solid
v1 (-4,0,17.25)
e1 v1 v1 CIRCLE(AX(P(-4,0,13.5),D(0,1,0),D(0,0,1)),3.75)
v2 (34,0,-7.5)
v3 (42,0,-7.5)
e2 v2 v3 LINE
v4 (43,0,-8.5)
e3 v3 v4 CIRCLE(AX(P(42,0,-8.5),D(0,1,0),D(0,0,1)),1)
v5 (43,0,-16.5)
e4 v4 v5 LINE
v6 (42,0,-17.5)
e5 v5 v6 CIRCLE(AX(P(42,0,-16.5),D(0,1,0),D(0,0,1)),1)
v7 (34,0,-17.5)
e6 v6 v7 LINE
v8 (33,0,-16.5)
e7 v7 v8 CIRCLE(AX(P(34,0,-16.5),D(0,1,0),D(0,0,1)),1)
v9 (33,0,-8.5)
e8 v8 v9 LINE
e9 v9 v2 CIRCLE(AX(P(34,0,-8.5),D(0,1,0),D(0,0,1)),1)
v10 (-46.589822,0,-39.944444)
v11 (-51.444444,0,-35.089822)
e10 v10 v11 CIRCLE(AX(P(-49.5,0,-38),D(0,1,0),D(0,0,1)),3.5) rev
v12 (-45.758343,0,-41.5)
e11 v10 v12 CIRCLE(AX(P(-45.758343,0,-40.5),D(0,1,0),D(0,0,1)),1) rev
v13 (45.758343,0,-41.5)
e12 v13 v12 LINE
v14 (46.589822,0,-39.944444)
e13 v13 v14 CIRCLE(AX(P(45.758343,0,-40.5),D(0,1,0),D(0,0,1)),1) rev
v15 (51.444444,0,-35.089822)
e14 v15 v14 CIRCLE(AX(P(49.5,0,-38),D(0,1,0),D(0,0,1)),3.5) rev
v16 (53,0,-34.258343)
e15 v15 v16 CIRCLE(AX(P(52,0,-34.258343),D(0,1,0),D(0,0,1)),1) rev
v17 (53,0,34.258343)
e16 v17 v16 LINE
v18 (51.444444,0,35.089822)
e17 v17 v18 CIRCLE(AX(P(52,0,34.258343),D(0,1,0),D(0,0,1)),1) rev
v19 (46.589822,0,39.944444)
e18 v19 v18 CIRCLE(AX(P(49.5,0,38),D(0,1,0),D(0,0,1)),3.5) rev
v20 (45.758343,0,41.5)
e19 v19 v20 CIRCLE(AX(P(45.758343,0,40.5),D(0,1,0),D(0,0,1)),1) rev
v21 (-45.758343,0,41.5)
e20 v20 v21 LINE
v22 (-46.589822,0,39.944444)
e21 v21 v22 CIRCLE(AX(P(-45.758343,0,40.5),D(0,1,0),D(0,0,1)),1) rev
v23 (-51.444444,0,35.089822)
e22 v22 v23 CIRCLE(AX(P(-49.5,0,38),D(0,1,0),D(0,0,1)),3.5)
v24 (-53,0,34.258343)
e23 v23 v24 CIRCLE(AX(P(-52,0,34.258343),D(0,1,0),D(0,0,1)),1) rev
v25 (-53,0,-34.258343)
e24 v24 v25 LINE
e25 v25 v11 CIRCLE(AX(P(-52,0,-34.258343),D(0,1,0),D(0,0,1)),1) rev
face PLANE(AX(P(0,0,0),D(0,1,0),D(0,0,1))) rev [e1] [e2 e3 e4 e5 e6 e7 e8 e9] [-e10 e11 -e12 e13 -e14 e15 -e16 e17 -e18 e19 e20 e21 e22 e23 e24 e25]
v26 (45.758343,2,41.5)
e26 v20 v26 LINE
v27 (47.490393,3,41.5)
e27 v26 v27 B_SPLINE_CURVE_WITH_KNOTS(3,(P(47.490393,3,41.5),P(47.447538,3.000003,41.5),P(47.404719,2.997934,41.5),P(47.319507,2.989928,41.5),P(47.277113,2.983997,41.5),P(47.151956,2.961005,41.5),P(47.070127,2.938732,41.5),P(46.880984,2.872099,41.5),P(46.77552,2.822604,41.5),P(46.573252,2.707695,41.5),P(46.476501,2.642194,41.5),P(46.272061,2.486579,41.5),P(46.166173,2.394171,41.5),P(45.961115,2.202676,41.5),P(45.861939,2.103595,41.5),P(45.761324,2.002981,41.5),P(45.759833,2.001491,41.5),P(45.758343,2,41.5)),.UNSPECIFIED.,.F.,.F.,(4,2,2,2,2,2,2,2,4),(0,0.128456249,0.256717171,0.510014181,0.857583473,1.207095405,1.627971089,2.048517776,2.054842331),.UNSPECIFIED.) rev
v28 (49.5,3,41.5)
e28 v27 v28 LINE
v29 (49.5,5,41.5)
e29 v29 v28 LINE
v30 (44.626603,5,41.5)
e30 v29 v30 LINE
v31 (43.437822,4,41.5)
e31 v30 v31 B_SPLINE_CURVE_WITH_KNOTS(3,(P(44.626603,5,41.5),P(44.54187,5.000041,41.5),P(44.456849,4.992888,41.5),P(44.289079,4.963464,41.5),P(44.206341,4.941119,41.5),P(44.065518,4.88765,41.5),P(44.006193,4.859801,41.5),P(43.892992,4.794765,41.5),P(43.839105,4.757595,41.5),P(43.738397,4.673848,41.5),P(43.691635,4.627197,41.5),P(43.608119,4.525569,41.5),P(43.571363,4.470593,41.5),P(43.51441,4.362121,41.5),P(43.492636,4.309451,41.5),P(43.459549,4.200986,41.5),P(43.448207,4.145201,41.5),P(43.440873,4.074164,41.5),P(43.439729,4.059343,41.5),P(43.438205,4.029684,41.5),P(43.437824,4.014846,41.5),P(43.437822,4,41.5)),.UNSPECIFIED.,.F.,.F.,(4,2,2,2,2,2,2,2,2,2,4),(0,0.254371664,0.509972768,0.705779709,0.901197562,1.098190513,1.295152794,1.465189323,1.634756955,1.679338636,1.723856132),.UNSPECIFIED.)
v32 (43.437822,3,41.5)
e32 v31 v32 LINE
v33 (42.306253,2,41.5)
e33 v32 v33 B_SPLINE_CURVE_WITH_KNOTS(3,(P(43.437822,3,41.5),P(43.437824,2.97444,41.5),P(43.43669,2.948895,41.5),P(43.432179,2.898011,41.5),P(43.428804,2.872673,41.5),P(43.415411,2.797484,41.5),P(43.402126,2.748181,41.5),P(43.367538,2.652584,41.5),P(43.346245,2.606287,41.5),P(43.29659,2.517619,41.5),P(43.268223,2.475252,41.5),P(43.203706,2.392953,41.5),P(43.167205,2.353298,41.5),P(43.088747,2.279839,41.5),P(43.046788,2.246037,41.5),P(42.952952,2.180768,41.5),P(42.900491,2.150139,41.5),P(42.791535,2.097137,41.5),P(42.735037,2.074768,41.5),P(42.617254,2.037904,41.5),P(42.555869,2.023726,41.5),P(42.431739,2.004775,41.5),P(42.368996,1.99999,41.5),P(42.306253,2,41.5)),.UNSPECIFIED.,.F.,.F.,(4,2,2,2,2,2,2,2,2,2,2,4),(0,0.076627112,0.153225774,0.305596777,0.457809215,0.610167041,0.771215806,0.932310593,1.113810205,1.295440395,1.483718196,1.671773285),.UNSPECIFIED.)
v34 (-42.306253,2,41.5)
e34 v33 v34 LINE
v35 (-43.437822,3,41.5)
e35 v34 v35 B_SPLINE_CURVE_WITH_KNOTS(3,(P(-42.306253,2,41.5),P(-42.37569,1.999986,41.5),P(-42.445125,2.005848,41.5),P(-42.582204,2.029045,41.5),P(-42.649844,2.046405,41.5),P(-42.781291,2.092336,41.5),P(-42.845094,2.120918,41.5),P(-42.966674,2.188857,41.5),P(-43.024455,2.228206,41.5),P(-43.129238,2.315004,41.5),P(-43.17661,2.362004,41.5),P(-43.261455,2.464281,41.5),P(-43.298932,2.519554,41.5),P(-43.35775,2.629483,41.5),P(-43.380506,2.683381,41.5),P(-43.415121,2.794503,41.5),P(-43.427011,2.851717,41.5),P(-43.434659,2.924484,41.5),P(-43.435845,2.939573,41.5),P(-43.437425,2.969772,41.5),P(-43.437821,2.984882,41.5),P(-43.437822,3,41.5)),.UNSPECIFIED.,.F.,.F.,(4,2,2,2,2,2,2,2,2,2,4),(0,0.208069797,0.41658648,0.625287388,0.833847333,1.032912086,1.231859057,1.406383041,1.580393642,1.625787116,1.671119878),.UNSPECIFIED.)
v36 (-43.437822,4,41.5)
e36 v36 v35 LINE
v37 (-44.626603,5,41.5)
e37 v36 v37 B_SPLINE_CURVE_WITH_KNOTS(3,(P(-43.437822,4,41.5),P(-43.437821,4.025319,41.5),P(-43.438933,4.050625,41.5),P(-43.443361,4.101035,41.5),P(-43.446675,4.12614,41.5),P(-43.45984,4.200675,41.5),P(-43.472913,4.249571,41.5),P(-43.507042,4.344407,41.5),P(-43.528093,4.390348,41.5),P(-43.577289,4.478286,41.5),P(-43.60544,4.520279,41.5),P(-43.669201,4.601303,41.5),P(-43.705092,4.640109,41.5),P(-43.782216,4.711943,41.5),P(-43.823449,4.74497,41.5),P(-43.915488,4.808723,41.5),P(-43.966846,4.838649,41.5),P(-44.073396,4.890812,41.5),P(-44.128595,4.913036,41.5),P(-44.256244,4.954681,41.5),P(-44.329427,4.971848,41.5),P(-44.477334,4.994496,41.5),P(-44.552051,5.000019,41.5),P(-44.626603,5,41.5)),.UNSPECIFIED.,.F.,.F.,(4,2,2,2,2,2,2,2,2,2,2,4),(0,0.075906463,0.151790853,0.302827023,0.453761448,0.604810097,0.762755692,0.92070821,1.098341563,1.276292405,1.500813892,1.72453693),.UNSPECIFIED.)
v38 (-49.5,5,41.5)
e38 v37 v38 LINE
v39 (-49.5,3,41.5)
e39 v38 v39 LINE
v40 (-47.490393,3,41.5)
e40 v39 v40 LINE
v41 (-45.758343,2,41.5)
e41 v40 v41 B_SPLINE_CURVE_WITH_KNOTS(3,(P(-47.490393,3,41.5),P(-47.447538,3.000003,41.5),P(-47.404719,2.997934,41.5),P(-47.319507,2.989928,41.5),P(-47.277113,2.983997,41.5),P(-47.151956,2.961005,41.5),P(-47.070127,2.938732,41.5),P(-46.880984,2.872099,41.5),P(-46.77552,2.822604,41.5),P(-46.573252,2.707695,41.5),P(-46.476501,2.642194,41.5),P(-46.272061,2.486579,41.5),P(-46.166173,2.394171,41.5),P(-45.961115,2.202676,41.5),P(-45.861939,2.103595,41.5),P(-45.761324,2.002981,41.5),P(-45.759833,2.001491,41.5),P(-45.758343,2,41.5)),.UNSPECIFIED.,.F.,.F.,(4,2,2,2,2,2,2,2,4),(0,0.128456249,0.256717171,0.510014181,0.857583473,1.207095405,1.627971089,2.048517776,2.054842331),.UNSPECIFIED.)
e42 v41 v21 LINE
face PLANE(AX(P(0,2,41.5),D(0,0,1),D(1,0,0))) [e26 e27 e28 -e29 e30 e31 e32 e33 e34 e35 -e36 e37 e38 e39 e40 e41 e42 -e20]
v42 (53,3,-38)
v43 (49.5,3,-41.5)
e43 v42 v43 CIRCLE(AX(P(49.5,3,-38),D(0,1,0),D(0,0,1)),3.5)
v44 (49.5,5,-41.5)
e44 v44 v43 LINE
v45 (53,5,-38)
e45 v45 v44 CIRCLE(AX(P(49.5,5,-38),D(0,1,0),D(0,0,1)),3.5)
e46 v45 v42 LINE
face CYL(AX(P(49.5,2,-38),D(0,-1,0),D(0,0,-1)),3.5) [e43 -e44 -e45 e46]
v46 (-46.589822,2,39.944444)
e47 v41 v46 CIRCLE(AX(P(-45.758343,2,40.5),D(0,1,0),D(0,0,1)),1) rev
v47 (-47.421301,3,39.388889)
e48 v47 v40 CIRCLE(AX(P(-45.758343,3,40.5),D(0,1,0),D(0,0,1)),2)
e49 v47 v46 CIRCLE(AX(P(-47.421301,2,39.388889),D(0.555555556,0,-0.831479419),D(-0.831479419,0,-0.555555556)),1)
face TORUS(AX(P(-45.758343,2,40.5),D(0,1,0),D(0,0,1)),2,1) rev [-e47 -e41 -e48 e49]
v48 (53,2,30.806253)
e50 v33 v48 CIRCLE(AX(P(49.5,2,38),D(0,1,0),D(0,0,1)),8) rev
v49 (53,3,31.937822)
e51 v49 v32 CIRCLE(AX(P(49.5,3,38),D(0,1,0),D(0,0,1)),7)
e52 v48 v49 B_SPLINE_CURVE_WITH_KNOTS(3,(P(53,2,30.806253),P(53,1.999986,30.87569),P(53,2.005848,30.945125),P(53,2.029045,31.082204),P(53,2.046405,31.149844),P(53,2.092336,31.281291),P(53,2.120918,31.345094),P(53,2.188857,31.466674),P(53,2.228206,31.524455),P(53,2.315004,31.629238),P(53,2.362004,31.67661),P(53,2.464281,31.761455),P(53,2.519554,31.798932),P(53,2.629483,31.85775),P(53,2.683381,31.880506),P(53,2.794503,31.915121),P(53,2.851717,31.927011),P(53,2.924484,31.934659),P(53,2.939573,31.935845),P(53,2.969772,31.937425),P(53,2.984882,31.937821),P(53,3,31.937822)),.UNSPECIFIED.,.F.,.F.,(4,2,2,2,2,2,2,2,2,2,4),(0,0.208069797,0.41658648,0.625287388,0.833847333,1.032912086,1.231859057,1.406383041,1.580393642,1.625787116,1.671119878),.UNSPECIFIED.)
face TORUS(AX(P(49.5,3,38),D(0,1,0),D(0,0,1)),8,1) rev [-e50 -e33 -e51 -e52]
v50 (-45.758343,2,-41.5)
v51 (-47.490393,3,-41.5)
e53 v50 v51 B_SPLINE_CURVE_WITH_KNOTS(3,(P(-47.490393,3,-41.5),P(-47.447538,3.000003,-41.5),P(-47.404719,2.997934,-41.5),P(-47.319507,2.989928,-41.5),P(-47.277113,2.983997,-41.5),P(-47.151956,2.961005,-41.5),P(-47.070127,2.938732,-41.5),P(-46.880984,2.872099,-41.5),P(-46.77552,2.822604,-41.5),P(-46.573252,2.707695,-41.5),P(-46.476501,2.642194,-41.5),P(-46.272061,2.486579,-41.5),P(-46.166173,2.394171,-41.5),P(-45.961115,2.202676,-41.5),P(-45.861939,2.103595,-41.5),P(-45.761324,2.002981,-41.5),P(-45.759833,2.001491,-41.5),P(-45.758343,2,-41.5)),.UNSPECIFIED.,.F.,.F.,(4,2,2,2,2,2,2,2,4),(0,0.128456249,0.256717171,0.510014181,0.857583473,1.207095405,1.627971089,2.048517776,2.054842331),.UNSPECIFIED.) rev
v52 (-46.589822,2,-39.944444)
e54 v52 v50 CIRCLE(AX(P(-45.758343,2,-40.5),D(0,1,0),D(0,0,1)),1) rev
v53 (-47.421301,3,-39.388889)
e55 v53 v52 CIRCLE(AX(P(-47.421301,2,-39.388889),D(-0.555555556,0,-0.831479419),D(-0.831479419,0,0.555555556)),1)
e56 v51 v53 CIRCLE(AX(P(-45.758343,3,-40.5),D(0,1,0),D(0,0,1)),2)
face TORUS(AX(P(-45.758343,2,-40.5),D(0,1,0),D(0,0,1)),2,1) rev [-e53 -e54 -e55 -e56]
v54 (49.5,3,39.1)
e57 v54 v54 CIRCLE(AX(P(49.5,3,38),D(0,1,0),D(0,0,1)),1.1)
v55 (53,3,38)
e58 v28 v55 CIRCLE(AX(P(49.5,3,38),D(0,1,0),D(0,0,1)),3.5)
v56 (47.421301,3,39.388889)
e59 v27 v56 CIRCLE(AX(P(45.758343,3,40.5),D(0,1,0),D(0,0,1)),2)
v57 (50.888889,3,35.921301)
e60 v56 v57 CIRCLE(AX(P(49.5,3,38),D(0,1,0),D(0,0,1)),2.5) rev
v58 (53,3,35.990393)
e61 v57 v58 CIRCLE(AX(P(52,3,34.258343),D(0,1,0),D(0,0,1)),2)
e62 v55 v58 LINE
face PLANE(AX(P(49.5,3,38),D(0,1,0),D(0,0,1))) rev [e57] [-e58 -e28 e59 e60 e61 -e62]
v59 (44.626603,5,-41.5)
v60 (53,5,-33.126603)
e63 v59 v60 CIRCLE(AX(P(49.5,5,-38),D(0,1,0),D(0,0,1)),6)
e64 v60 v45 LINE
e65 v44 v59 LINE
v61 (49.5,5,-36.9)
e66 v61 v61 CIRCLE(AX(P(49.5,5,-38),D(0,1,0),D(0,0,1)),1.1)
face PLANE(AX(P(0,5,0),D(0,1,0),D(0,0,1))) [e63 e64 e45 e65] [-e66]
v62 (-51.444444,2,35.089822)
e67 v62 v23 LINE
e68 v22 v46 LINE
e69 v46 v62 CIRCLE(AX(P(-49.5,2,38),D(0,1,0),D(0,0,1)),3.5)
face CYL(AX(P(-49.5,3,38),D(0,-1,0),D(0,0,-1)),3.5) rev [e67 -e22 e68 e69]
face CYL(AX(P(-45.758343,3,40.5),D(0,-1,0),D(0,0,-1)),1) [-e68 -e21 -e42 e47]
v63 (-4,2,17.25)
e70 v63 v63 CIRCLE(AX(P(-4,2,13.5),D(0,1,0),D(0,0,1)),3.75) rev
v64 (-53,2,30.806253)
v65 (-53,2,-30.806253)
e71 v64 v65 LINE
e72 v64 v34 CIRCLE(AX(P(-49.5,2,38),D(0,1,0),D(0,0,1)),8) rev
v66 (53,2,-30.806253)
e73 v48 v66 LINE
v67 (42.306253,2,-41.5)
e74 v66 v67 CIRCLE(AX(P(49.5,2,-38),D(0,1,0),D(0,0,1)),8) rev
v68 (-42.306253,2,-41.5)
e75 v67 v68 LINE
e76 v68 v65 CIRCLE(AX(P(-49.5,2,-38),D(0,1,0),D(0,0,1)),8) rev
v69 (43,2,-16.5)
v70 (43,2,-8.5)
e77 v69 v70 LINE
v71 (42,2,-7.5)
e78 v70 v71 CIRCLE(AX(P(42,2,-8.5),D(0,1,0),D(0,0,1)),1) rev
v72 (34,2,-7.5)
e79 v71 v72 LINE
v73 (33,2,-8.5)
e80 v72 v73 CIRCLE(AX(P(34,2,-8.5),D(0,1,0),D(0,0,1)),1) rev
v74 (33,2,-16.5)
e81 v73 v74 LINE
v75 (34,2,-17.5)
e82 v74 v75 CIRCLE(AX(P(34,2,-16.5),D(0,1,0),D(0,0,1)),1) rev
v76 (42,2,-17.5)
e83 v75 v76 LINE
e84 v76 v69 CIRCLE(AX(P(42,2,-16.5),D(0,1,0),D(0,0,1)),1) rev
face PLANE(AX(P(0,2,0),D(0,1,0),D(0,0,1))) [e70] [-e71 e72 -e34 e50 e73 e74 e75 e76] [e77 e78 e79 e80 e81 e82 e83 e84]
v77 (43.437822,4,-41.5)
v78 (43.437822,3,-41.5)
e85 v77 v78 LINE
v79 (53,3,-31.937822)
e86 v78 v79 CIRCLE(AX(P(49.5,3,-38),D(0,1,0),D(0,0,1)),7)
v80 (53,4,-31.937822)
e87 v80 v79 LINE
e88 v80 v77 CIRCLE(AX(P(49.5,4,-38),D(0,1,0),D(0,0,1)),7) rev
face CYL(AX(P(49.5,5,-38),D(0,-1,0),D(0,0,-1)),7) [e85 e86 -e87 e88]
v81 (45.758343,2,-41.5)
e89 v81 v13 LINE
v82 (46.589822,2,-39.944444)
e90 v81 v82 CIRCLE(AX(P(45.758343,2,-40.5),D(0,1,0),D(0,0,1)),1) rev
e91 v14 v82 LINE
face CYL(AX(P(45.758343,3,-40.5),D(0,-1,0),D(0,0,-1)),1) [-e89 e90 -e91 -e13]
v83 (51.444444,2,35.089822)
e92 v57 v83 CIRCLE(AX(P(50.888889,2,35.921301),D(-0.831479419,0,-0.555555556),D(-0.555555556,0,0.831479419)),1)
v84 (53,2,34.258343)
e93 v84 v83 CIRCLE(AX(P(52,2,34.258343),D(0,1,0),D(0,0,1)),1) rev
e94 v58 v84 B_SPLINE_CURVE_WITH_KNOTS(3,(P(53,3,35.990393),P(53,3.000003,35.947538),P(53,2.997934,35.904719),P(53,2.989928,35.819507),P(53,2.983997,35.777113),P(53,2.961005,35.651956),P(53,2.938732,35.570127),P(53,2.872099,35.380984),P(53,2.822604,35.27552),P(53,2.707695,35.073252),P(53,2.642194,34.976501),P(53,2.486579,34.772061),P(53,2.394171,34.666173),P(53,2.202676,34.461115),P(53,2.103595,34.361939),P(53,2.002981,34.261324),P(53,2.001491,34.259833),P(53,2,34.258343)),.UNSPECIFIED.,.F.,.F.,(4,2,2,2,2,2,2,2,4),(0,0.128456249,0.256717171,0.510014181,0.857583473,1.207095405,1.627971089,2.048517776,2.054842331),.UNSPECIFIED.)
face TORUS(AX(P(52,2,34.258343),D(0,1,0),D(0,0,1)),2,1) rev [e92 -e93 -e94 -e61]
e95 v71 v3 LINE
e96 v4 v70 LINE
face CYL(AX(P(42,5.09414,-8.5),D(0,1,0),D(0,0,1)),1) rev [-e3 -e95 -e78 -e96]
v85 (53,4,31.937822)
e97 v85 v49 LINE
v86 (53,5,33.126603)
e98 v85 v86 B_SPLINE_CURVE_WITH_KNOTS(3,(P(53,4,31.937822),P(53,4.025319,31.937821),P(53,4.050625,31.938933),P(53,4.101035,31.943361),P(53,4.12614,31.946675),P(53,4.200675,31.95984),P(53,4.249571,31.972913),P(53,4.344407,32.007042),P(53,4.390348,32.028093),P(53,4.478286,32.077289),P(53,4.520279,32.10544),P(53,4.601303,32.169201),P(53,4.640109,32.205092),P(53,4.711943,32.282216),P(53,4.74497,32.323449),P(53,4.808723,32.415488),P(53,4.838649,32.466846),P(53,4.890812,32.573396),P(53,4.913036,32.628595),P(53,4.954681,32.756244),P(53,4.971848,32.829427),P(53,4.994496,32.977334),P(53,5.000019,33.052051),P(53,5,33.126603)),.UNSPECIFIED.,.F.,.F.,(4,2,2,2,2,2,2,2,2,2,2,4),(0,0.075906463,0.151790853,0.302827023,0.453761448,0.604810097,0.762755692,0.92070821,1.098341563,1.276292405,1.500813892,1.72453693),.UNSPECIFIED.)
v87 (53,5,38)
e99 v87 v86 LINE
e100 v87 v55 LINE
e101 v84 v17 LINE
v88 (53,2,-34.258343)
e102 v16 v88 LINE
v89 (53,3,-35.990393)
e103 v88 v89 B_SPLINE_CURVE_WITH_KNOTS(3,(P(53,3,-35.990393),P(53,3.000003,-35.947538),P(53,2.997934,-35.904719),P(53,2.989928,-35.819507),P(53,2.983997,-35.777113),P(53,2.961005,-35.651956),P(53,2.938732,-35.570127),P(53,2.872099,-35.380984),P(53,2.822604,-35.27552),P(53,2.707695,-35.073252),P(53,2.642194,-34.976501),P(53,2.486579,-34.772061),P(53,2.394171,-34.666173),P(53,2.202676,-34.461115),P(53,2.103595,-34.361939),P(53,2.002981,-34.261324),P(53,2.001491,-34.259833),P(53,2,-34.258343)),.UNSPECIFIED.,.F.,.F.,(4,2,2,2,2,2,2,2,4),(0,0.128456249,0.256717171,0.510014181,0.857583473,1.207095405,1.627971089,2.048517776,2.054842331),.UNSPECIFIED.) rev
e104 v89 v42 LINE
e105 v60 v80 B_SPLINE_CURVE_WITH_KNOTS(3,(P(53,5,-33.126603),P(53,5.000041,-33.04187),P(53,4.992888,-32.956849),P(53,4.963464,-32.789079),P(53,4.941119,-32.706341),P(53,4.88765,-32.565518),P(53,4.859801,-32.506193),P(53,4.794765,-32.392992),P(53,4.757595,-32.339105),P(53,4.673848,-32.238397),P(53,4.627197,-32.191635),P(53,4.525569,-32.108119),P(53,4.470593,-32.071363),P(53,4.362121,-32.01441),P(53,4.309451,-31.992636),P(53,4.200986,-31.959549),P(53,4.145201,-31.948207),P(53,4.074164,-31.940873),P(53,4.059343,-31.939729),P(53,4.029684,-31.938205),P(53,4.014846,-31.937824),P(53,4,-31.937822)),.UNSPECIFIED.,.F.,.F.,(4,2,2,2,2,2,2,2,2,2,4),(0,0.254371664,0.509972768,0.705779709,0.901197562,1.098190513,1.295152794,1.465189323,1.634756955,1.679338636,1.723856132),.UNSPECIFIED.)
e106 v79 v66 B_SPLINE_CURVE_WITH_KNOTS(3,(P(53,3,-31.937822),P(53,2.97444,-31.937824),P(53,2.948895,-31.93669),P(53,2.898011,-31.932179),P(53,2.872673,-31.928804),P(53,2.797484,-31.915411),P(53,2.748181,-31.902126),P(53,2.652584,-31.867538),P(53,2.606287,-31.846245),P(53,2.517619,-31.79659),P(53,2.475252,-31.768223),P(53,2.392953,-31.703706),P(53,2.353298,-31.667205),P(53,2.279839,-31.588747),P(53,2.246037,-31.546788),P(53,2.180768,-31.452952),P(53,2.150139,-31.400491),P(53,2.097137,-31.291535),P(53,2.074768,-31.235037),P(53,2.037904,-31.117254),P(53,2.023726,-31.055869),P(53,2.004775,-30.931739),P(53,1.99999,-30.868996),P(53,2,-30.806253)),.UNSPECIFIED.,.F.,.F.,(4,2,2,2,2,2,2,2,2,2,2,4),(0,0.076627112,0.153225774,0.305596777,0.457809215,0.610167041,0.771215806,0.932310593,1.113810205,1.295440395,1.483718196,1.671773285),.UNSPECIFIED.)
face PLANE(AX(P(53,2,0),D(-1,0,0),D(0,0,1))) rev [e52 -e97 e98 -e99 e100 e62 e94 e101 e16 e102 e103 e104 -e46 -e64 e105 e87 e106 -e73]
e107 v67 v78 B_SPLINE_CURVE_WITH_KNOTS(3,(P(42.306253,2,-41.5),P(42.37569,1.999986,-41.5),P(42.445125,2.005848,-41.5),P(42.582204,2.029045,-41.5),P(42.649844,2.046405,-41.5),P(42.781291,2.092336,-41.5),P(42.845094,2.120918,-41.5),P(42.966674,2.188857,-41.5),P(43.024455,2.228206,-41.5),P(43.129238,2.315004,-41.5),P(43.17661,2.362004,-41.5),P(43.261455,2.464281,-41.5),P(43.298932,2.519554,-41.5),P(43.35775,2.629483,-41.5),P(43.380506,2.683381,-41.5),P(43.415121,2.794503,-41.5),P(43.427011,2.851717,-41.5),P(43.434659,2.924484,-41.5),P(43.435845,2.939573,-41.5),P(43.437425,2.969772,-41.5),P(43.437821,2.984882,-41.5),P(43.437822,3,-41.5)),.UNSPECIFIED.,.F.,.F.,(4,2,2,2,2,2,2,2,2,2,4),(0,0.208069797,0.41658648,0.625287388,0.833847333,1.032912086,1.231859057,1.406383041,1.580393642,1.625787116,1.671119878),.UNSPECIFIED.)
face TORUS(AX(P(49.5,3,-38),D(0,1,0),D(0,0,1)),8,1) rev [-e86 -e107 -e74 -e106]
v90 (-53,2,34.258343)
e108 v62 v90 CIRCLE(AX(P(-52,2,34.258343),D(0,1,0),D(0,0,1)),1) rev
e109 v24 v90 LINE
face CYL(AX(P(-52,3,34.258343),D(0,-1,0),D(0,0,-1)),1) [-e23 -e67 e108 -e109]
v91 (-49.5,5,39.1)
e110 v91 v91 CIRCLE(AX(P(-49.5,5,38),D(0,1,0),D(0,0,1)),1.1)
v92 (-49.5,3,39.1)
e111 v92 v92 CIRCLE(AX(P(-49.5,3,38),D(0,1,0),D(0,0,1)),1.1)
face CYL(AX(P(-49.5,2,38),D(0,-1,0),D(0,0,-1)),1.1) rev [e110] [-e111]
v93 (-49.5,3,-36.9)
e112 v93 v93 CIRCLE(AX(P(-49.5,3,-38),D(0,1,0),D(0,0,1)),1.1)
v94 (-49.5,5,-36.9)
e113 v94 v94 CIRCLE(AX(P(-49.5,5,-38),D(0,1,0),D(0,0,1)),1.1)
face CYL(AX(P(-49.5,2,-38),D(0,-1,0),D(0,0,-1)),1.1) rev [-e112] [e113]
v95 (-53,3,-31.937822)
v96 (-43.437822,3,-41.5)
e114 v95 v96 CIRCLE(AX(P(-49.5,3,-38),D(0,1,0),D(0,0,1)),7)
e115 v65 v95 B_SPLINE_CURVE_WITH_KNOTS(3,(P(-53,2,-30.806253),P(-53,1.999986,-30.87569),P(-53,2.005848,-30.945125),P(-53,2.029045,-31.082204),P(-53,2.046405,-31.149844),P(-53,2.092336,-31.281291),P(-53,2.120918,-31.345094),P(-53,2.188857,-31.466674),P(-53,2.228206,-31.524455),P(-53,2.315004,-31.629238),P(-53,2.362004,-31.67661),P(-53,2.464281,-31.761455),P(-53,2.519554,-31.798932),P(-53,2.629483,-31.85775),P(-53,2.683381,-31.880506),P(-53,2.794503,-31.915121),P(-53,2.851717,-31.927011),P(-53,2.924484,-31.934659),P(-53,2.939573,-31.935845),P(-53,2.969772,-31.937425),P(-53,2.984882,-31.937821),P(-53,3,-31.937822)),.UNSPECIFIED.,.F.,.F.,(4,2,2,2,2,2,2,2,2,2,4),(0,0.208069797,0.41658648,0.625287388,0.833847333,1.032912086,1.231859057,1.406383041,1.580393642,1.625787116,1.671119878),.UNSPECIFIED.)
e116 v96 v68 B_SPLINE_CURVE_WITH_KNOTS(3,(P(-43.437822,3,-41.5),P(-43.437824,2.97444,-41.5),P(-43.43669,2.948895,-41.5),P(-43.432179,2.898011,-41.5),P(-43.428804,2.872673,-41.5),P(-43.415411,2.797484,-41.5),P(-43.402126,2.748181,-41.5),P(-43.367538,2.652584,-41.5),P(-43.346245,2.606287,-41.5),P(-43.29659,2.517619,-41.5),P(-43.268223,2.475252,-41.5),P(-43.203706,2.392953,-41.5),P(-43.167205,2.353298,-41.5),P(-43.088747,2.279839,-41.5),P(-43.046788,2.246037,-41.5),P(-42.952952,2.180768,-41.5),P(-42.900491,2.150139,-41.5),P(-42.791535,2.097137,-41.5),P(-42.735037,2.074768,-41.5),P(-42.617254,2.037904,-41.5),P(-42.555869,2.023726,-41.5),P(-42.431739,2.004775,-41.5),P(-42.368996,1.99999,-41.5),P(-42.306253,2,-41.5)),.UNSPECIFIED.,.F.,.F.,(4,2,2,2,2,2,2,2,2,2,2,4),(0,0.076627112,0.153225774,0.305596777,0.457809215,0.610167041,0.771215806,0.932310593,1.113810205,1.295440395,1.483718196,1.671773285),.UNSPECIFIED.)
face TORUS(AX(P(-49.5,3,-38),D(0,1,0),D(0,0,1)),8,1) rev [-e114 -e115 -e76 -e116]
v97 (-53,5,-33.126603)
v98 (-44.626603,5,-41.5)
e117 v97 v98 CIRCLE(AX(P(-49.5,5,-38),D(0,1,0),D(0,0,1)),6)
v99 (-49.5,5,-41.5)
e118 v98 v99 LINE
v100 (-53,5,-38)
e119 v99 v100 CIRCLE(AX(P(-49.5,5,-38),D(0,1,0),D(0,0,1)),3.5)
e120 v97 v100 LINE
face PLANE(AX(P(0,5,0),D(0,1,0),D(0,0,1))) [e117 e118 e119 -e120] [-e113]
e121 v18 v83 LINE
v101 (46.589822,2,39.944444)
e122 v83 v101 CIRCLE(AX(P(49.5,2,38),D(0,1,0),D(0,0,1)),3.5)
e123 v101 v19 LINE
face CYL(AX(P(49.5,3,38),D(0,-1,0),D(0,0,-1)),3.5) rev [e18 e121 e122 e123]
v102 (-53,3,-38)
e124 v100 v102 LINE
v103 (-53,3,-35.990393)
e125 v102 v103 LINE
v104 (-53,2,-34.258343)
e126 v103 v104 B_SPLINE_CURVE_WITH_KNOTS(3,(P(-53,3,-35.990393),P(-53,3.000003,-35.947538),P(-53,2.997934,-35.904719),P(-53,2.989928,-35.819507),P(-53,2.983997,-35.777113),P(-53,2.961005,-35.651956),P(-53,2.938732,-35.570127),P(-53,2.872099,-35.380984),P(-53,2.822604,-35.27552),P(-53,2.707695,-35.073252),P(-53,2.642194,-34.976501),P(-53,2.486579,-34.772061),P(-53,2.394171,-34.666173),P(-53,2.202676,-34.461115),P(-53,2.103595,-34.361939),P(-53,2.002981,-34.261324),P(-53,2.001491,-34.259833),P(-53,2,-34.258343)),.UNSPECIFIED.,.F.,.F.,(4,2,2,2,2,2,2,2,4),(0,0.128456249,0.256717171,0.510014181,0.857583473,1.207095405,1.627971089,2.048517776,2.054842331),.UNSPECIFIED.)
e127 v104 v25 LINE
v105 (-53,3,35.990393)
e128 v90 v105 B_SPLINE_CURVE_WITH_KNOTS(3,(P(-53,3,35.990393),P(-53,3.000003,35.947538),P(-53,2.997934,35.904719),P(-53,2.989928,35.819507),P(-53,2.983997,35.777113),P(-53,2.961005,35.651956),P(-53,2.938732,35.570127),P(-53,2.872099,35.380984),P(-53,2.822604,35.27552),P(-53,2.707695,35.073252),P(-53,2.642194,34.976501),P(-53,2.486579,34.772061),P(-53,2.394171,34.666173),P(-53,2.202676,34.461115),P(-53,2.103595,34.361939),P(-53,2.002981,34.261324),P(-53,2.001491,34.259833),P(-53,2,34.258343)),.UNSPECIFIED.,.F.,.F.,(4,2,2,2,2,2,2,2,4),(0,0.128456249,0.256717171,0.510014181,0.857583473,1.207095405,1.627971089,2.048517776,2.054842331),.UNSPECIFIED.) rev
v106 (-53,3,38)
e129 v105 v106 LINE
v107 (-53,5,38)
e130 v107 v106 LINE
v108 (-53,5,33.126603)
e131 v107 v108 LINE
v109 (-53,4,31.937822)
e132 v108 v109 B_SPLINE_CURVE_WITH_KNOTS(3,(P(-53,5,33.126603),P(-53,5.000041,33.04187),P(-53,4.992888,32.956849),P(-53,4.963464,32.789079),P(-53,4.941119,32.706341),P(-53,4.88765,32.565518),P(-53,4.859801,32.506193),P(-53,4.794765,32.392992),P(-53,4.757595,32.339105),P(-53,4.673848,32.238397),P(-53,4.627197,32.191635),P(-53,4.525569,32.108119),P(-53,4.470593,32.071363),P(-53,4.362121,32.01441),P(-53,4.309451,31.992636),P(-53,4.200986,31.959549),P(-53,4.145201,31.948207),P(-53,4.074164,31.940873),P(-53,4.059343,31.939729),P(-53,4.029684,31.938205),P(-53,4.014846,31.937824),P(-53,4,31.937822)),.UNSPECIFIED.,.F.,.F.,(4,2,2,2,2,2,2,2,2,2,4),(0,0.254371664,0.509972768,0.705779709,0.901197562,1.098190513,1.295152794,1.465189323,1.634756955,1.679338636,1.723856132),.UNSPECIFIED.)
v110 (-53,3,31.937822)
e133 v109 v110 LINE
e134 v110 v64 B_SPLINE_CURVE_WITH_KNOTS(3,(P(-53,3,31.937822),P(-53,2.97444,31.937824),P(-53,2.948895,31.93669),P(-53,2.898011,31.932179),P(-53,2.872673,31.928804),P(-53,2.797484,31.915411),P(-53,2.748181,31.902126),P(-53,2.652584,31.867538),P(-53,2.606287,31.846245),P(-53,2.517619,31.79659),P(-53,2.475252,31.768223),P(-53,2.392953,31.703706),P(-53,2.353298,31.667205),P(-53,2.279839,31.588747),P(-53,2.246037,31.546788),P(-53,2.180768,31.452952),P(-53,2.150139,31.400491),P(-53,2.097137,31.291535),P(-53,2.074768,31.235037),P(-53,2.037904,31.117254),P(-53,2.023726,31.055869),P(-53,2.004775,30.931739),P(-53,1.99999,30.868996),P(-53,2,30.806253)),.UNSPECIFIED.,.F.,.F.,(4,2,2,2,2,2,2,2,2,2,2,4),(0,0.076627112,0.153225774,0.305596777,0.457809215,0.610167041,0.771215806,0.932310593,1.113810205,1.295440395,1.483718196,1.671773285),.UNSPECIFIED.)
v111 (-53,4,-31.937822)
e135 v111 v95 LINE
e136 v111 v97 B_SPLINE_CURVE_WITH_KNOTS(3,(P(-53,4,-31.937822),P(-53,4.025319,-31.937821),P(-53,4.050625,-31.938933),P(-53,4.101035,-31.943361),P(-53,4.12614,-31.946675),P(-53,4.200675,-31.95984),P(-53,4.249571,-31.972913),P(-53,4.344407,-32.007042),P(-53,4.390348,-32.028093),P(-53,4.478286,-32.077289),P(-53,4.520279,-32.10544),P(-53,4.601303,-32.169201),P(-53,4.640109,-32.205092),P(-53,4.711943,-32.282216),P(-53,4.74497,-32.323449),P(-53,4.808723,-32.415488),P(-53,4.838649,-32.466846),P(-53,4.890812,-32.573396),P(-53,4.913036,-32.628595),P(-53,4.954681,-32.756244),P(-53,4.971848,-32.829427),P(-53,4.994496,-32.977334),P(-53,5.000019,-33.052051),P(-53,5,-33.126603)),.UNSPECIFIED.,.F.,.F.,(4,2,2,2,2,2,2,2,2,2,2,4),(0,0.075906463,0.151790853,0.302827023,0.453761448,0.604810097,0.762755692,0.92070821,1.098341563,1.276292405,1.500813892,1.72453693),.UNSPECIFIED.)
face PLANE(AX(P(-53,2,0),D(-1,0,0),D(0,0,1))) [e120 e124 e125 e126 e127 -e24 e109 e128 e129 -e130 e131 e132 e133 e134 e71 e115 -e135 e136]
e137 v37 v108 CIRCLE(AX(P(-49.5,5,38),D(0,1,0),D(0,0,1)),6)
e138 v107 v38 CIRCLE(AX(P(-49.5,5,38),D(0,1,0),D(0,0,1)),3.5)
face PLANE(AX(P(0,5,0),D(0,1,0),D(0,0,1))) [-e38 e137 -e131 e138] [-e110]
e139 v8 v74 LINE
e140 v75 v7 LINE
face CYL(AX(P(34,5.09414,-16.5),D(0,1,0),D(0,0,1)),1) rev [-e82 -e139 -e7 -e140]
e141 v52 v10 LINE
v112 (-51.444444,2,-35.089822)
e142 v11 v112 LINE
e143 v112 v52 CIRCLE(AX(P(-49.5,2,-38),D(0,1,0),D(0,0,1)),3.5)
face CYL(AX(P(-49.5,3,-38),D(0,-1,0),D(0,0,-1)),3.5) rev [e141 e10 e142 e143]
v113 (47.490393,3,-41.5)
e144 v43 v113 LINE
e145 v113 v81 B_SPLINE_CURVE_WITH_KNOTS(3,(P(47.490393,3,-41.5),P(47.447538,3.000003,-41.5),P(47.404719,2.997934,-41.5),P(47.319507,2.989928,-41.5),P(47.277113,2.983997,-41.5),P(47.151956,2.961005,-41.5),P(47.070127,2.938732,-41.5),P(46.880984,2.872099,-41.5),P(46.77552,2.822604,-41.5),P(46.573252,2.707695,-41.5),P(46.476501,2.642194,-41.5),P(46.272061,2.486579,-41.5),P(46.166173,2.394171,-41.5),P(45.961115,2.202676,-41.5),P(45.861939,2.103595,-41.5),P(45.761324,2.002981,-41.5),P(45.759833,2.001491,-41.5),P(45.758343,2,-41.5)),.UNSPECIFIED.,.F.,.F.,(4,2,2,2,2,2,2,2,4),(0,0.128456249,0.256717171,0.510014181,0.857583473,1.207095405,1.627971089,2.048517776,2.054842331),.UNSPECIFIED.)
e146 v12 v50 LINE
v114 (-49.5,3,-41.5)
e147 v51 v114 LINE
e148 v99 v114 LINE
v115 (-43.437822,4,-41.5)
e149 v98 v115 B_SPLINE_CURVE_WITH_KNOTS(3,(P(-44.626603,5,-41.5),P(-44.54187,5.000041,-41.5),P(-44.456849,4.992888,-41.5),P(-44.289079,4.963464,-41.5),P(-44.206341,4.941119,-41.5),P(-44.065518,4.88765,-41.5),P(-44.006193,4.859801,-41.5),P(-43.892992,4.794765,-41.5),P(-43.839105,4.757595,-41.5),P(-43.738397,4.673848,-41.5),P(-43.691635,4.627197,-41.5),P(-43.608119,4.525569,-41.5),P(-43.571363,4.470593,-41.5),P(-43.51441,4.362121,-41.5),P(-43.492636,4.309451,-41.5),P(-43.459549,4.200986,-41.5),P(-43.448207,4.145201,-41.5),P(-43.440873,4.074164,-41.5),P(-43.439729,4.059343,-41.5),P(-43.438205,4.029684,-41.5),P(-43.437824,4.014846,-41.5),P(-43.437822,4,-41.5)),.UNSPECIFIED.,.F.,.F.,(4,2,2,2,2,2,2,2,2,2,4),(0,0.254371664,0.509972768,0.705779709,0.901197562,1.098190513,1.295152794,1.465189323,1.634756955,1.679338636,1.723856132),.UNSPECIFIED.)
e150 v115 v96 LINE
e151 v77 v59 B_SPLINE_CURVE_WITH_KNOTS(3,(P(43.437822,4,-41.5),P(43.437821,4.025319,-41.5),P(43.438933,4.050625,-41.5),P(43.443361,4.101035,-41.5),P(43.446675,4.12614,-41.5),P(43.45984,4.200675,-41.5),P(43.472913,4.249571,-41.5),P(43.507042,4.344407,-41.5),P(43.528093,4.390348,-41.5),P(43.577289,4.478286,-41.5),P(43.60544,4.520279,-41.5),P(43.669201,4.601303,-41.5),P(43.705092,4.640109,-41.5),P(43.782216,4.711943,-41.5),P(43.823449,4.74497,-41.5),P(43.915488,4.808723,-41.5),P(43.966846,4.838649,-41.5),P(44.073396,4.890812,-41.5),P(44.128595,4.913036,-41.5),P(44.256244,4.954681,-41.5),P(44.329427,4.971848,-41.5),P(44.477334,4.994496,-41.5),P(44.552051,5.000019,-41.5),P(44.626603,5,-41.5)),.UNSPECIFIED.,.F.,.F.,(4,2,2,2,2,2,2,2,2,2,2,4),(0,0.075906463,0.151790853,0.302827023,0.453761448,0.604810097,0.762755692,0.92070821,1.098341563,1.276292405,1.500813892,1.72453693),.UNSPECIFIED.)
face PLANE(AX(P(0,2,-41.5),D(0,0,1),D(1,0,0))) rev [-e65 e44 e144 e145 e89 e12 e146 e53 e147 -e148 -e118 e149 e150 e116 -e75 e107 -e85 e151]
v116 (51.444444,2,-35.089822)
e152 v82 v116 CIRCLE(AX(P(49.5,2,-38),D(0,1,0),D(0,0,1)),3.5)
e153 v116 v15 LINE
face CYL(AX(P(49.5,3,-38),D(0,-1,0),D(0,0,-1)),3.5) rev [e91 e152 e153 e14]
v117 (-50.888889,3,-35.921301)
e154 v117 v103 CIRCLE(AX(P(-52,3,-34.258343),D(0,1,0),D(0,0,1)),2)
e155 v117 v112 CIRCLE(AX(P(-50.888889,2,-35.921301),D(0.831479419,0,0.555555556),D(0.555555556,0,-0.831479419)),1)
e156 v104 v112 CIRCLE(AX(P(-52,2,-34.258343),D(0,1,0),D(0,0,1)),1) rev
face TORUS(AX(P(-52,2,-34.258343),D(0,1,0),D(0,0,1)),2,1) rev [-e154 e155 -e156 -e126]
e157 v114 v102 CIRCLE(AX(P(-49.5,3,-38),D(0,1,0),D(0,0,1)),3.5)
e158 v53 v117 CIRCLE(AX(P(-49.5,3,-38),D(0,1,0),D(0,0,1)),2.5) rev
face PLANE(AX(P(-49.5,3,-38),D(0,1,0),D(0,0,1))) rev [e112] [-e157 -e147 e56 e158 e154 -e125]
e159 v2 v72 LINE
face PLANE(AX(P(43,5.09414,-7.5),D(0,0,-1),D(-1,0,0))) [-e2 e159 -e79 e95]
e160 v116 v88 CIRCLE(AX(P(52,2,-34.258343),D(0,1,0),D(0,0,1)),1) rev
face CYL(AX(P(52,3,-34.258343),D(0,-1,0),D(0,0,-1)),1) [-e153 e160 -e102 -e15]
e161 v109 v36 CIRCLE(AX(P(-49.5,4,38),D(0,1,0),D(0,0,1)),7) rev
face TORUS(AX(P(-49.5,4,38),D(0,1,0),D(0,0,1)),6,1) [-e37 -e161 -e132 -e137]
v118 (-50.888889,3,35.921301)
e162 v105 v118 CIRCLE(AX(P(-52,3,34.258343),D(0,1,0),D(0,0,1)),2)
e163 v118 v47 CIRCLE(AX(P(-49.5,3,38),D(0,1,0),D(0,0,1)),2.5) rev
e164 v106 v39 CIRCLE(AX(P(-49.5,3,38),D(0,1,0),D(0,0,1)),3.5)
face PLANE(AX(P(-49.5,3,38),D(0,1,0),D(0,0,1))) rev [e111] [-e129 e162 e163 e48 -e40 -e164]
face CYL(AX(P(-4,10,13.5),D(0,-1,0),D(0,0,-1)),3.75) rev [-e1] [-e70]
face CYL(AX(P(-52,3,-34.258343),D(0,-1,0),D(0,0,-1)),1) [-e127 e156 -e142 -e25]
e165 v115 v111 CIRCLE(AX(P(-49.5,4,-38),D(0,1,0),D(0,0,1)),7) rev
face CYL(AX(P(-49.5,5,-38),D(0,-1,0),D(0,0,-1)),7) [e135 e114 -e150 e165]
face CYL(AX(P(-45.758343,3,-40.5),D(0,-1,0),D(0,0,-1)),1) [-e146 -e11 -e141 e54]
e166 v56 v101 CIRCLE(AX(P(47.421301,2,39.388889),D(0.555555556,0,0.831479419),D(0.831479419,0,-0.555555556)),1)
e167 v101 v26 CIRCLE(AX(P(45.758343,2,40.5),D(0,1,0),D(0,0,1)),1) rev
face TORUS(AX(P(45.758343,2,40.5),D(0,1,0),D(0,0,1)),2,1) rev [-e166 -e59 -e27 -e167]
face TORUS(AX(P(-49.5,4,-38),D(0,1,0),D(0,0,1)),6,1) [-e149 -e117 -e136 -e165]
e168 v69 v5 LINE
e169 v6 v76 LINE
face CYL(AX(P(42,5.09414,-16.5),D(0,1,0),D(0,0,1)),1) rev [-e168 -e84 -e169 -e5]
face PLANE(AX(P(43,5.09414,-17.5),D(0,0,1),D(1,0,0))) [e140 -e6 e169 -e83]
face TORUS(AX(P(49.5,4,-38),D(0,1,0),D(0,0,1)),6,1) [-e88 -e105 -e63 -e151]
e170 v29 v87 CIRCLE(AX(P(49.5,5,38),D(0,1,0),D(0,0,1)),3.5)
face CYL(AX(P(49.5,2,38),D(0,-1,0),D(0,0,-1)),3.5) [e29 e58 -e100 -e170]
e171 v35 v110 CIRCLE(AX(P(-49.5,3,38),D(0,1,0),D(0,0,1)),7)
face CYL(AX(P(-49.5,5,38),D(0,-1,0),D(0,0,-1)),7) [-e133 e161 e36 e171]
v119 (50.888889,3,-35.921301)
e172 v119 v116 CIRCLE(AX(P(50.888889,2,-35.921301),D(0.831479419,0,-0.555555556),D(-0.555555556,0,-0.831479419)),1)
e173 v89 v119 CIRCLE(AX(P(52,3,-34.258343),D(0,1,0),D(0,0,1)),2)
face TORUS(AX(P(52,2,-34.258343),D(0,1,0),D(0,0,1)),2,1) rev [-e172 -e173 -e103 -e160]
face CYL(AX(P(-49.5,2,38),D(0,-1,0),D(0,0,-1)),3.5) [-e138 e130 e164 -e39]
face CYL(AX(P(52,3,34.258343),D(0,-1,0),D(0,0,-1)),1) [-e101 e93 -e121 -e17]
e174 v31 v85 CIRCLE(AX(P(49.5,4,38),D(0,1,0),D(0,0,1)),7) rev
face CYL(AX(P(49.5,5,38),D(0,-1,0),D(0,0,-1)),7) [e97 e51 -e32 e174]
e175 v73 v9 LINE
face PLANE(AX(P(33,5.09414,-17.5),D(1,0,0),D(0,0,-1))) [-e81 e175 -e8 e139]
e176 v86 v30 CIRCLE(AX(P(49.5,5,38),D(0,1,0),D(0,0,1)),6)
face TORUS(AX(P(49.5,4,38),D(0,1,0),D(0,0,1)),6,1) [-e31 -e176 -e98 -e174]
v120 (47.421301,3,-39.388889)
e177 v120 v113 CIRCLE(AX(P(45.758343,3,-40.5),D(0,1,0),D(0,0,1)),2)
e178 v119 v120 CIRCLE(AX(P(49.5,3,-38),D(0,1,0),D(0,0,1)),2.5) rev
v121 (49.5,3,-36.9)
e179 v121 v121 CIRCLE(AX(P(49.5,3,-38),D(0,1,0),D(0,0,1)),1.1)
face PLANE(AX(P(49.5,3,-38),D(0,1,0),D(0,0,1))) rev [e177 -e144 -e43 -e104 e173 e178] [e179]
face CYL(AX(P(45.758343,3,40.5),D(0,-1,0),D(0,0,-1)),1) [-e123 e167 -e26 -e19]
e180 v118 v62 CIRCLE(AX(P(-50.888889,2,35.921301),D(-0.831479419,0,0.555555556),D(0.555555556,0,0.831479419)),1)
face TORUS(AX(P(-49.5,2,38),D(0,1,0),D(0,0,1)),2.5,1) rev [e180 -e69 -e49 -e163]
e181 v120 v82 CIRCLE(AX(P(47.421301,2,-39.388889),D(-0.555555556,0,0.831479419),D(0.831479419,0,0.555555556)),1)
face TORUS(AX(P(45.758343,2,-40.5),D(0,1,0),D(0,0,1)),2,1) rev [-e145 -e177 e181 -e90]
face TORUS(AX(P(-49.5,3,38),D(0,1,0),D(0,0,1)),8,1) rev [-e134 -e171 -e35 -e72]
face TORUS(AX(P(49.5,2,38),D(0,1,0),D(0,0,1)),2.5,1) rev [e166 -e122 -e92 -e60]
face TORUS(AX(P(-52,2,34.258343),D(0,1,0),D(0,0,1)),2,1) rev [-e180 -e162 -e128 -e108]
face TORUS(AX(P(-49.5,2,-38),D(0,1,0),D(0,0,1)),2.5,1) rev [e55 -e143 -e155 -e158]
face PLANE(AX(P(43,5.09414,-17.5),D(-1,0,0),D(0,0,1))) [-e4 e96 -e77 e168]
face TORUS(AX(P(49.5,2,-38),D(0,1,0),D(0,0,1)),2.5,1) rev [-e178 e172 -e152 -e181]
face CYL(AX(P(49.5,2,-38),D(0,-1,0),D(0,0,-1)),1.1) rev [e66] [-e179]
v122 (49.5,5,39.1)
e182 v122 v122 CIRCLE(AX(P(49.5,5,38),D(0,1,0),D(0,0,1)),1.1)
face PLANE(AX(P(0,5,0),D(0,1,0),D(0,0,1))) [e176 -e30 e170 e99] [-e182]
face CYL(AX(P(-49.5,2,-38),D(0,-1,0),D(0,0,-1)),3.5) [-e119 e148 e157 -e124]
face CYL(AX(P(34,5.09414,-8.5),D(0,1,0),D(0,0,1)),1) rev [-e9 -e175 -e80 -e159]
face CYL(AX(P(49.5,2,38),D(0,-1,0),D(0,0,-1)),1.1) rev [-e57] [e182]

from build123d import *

# Parameters (mm, degrees)
SKETCH_1_R          = 1.1
EXTRUDE_1_DEPTH     = 2
SKETCH_1_3_R        = 3.5
SKETCH_1_3_R_2      = 1.1
EXTRUDE_2_DEPTH     = 5
SKETCH_1_4_R        = 3.5
CUT_EXTRUDE_1_DEPTH = 3
FILLET_START        = -1
FILLET_1_DEPTH      = 4
FILLET_2_R          = 1
FILLET_3_R          = 1
SKETCH_2_R          = 3.75
CUT_EXTRUDE_3_DEPTH = 10
SKETCH_3_W          = 10
SKETCH_3_H          = 10
CUT_EXTRUDE_5_DEPTH = 68.500000147
FILLET_4_R          = 1


with BuildPart() as part:
    # Эскиз1 → Бобышка-Вытянуть1 (new body)
    with BuildSketch(Plane(origin=(0, 0, 0), x_dir=(1, 0, 0), z_dir=(0, 1, 0))):
        with BuildLine():
            ThreePointArc((49.5, -41.5), (51.974873734, -40.474873734), (53, -38))
            Line((53, -38), (53, 38))
            ThreePointArc((53, 38), (51.974873734, 40.474873734), (49.5, 41.5))
            Line((49.5, 41.5), (-49.5, 41.5))
            ThreePointArc((-49.5, 41.5), (-51.974873734, 40.474873734), (-53, 38))
            Line((-53, 38), (-53, -38))
            ThreePointArc((-53, -38), (-51.974873749, -40.47487372), (-49.500000041, -41.5))
            Line((-49.500000041, -41.5), (49.5, -41.5))
        make_face()
        with Locations(Location((49.5, -38, 0), (0, 0, 270))):
            Circle(SKETCH_1_R, mode=Mode.SUBTRACT)
        with Locations(Location((-49.5, -38, 0), (0, 0, 270))):
            Circle(SKETCH_1_R, mode=Mode.SUBTRACT)
        with Locations(Location((49.5, 38, 0), (0, 0, 270))):
            Circle(SKETCH_1_R, mode=Mode.SUBTRACT)
        with Locations(Location((-49.5, 38, 0), (0, 0, 270))):
            Circle(SKETCH_1_R, mode=Mode.SUBTRACT)
    extrude(amount=EXTRUDE_1_DEPTH)

    # Эскиз1<3> → Бобышка-Вытянуть2 (add)
    # profile 1 of 8: a face of its own
    with BuildSketch(Plane(origin=(0, 0, 0), x_dir=(1, 0, 0), z_dir=(0, 1, 0))):
        with BuildLine():
            Line((-53, 38), (-53, 31.937822174))
            ThreePointArc((-53, 31.937822174), (-46, 31.937822174), (-42.5, 38))
            ThreePointArc((-42.5, 38), (-42.738519216, 39.811733316), (-43.437822174, 41.5))
            Line((-43.437822174, 41.5), (-49.5, 41.5))
            ThreePointArc((-49.5, 41.5), (-47.025126266, 40.474873734), (-46, 38))
            ThreePointArc((-46, 38), (-49.5, 34.5), (-53, 38))
        make_face()
    # profile 2 of 8: a face of its own
    with BuildSketch(Plane(origin=(0, 0, 0), x_dir=(1, 0, 0), z_dir=(0, 1, 0))):
        with BuildLine():
            ThreePointArc((43.437822174, 41.5), (44.550252532, 33.050252532), (53, 31.937822174))
            Line((53, 31.937822174), (53, 38))
            ThreePointArc((53, 38), (47.025126266, 35.525126266), (49.5, 41.5))
            Line((49.5, 41.5), (43.437822174, 41.5))
        make_face()
    # profile 3 of 8: a face of its own
    with BuildSketch(Plane(origin=(0, 0, 0), x_dir=(1, 0, 0), z_dir=(0, 1, 0))):
        with Locations((49.5, 38)):
            Circle(SKETCH_1_3_R)
        with Locations(Location((49.5, 38, 0), (0, 0, 270))):
            Circle(SKETCH_1_3_R_2, mode=Mode.SUBTRACT)
    # profile 4 of 8: a face of its own
    with BuildSketch(Plane(origin=(0, 0, 0), x_dir=(1, 0, 0), z_dir=(0, 1, 0))):
        with Locations((49.5, -38)):
            Circle(SKETCH_1_3_R)
        with Locations(Location((49.5, -38, 0), (0, 0, 270))):
            Circle(SKETCH_1_3_R_2, mode=Mode.SUBTRACT)
    # profile 5 of 8: a face of its own
    with BuildSketch(Plane(origin=(0, 0, 0), x_dir=(1, 0, 0), z_dir=(0, 1, 0))):
        with BuildLine():
            Line((43.437822174, -41.5), (49.5, -41.5))
            ThreePointArc((49.5, -41.5), (47.025126266, -35.525126266), (53, -38))
            Line((53, -38), (53, -31.937822174))
            ThreePointArc((53, -31.937822174), (44.550252532, -33.050252532), (43.437822174, -41.5))
        make_face()
    # profile 6 of 8: a face of its own
    with BuildSketch(Plane(origin=(0, 0, 0), x_dir=(1, 0, 0), z_dir=(0, 1, 0))):
        with BuildLine():
            Line((-49.500000041, -41.5), (-43.437822174, -41.5))
            ThreePointArc((-43.437822174, -41.5), (-42.738519216, -39.811733316), (-42.5, -38))
            ThreePointArc((-42.5, -38), (-46, -31.937822174), (-53, -31.937822174))
            Line((-53, -31.937822174), (-53, -38))
            ThreePointArc((-53, -38), (-49.5, -34.5), (-46, -38))
            ThreePointArc((-46, -38), (-47.02512628, -40.474873749), (-49.500000041, -41.5))
        make_face()
    # profile 7 of 8: a face of its own
    with BuildSketch(Plane(origin=(0, 0, 0), x_dir=(1, 0, 0), z_dir=(0, 1, 0))):
        with Locations((-49.5, -38)):
            Circle(SKETCH_1_3_R)
        with Locations(Location((-49.5, -38, 0), (0, 0, 270))):
            Circle(SKETCH_1_3_R_2, mode=Mode.SUBTRACT)
    # profile 8 of 8: a face of its own
    with BuildSketch(Plane(origin=(0, 0, 0), x_dir=(1, 0, 0), z_dir=(0, 1, 0))):
        with Locations((-49.5, 38)):
            Circle(SKETCH_1_3_R)
        with Locations(Location((-49.5, 38, 0), (0, 0, 270))):
            Circle(SKETCH_1_3_R_2, mode=Mode.SUBTRACT)
    extrude(amount=EXTRUDE_2_DEPTH)

    # Эскиз1<4> → Вырез-Вытянуть1 (cut)
    with BuildSketch(Plane(origin=(0, 0, 0), x_dir=(1, 0, 0), z_dir=(0, 1, 0))):
        with Locations((-49.5, 38)):
            Circle(SKETCH_1_4_R)
        with Locations((-49.5, -38)):
            Circle(SKETCH_1_4_R)
        with Locations((49.5, -38)):
            Circle(SKETCH_1_4_R)
        with Locations((49.5, 38)):
            Circle(SKETCH_1_4_R)
    extrude(amount=CUT_EXTRUDE_1_DEPTH, mode=Mode.SUBTRACT)

    # Скругление1: read off the stored shape, not the designer's step
    # Скругление1 outline → Скругление1 (cut)
    with BuildSketch(Plane(origin=(0, 0, 0), x_dir=(1, 0, 0), z_dir=(0, 1, 0)).offset(FILLET_START)):
        with BuildLine():
            Line((49.5, 41.5), (45.758342613, 41.5))
            ThreePointArc((45.758342613, 41.5), (46.640259717, 40.971404521), (46.589822033, 39.944444444))
            ThreePointArc((46.589822033, 39.944444444), (47.850084177, 41.086709863), (49.5, 41.5))
        make_face()
        with BuildLine():
            ThreePointArc((-46.589822033, 39.944444444), (-46.640259717, 40.971404521), (-45.758342613, 41.5))
            Line((-45.758342613, 41.5), (-49.5, 41.5))
            ThreePointArc((-49.5, 41.5), (-47.850084177, 41.086709863), (-46.589822033, 39.944444444))
        make_face()
        with BuildLine():
            ThreePointArc((53, 38), (52.586709863, 36.350084177), (51.444444444, 35.089822033))
            ThreePointArc((51.444444444, 35.089822033), (52.471404521, 35.140259717), (53, 34.258342613))
            Line((53, 34.258342613), (53, 38))
        make_face()
        with BuildLine():
            ThreePointArc((-53, 34.258342613), (-52.471404521, 35.140259717), (-51.444444444, 35.089822033))
            ThreePointArc((-51.444444444, 35.089822033), (-52.586709863, 36.350084177), (-53, 38))
            Line((-53, 38), (-53, 34.258342613))
        make_face()
        with BuildLine():
            Line((53, -38), (53, -34.258342613))
            ThreePointArc((53, -34.258342613), (52.471404521, -35.140259717), (51.444444444, -35.089822033))
            ThreePointArc((51.444444444, -35.089822033), (52.586709863, -36.350084177), (53, -38))
        make_face()
        with BuildLine():
            ThreePointArc((-51.444444444, -35.089822033), (-52.471404521, -35.140259717), (-53, -34.258342613))
            Line((-53, -34.258342613), (-53, -38))
            ThreePointArc((-53, -38), (-52.586709863, -36.350084177), (-51.444444444, -35.089822033))
        make_face()
        with BuildLine():
            ThreePointArc((49.5, -41.5), (47.850084177, -41.086709863), (46.589822033, -39.944444444))
            ThreePointArc((46.589822033, -39.944444444), (46.640259717, -40.971404521), (45.758342613, -41.5))
            Line((45.758342613, -41.5), (49.5, -41.5))
        make_face()
        with BuildLine():
            ThreePointArc((-45.758342613, -41.5), (-46.640259717, -40.971404521), (-46.589822033, -39.944444444))
            ThreePointArc((-46.589822033, -39.944444444), (-47.850084177, -41.086709863), (-49.5, -41.5))
            Line((-49.5, -41.5), (-45.758342613, -41.5))
        make_face()
    extrude(amount=FILLET_1_DEPTH, mode=Mode.SUBTRACT)

    # Скругление2
    fillet_2_edges = [part.edges().sort_by_distance(p)[0] for p in [
        (-44.550252532, 2, -33.050252532),
        (-44.550252532, 5, -33.050252532),
        (44.550252532, 2, -33.050252532),
        (44.550252532, 5, -33.050252532),
        (44.550252532, 2, 33.050252532),
        (44.550252532, 5, 33.050252532),
        (-44.550252532, 2, 33.050252532),
        (-44.550252532, 5, 33.050252532),
    ]]
    fillet(fillet_2_edges, radius=FILLET_2_R)

    # Скругление3
    # the kernel refuses this fillet: 1 mm, written as the material it adds along each edge
    with BuildSketch(Plane(origin=(49.5, 3, -38), x_dir=(-0.8314794192984706, 0, -0.5555555555325482), z_dir=(0.5555555555325482, 0, -0.8314794192984706))) as fillet_3_piece_1:
        with BuildLine():
            CenterArc((3.5 - FILLET_3_R, -FILLET_3_R), FILLET_3_R, 0, 90)
            Line((3.5 - FILLET_3_R, 0), (3.5, 0))
            Line((3.5, 0), (3.5, -FILLET_3_R))
        make_face()
    revolve(axis=Axis((49.5, 3, -38), (0, 1, 0)), revolution_arc=157.497977189)
    with BuildSketch(Plane(origin=(49.5, 3, 38), x_dir=(0.5555555555325482, 0, -0.8314794192984706), z_dir=(0.8314794192984706, 0, 0.5555555555325482))) as fillet_3_piece_2:
        with BuildLine():
            CenterArc((3.5 - FILLET_3_R, -FILLET_3_R), FILLET_3_R, 0, 90)
            Line((3.5 - FILLET_3_R, 0), (3.5, 0))
            Line((3.5, 0), (3.5, -FILLET_3_R))
        make_face()
    revolve(axis=Axis((49.5, 3, 38), (0, 1, 0)), revolution_arc=157.497977189)
    with BuildSketch(Plane(origin=(-49.5, 3, 38), x_dir=(-0.5555555555325417, 0, -0.8314794192984749), z_dir=(-0.8314794192984749, 0, 0.5555555555325417))) as fillet_3_piece_3:
        with BuildLine():
            CenterArc((3.5 - FILLET_3_R, FILLET_3_R), FILLET_3_R, 270, 90)
            Line((3.5, FILLET_3_R), (3.5, 0))
            Line((3.5, 0), (3.5 - FILLET_3_R, 0))
        make_face()
    revolve(axis=Axis((-49.5, 3, 38), (0, -1, 0)), revolution_arc=157.497977189)
    with BuildSketch(Plane(origin=(-49.5, 3, -38), x_dir=(-0.5555555555325417, 0, 0.8314794192984749), z_dir=(-0.8314794192984749, 0, -0.5555555555325417))) as fillet_3_piece_4:
        with BuildLine():
            CenterArc((3.5 - FILLET_3_R, -FILLET_3_R), FILLET_3_R, 0, 90)
            Line((3.5, -FILLET_3_R), (3.5, 0))
            Line((3.5, 0), (3.5 - FILLET_3_R, 0))
        make_face()
    revolve(axis=Axis((-49.5, 3, -38), (0, 1, 0)), revolution_arc=157.497977189)
    with BuildSketch(Plane(origin=(45.758342613, 3, -40.5), x_dir=(-0.596949580090342, 0, 0.802278753819372), z_dir=(0.802278753819372, 0, 0.596949580090342))) as fillet_3_piece_5_section:
        with BuildLine():
            CenterArc((1 + FILLET_3_R, FILLET_3_R), FILLET_3_R, 180, 90)
            Line((1 + FILLET_3_R, 0), (1, 0))
            Line((1, 0), (1, FILLET_3_R))
        make_face()
    fillet_3_piece_5 = revolve(axis=Axis((45.758342613, 3, -40.5), (0, -1, 0)), revolution_arc=267.097250193, mode=Mode.PRIVATE)
    fillet_3_piece_5 = split(fillet_3_piece_5, bisect_by=Plane(origin=(45.758342613, 3, -41.5), z_dir=(0, 0, 1)), keep=Keep.TOP, mode=Mode.PRIVATE)
    add(fillet_3_piece_5)
    with BuildSketch(Plane(origin=(52, 3, -34.258342613), x_dir=(-0.5555555552777314, 0, -0.8314794194687273), z_dir=(-0.8314794194687273, 0, 0.5555555552777314))) as fillet_3_piece_6_section:
        with BuildLine():
            CenterArc((1 + FILLET_3_R, FILLET_3_R), FILLET_3_R, 180, 90)
            Line((1 + FILLET_3_R, 0), (1, 0))
            Line((1, 0), (1, FILLET_3_R))
        make_face()
    fillet_3_piece_6 = revolve(axis=Axis((52, 3, -34.258342613), (0, -1, 0)), revolution_arc=267.097250193, mode=Mode.PRIVATE)
    fillet_3_piece_6 = split(fillet_3_piece_6, bisect_by=Plane(origin=(53, 3, -34.258342613), z_dir=(-1, 0, 0)), keep=Keep.TOP, mode=Mode.PRIVATE)
    add(fillet_3_piece_6)
    with BuildSketch(Plane(origin=(45.758342613, 3, 40.5), x_dir=(0.8314794194687273, 0, -0.5555555552777314), z_dir=(-0.5555555552777314, 0, -0.8314794194687273))) as fillet_3_piece_7_section:
        with BuildLine():
            CenterArc((1 + FILLET_3_R, FILLET_3_R), FILLET_3_R, 180, 90)
            Line((1 + FILLET_3_R, 0), (1, 0))
            Line((1, 0), (1, FILLET_3_R))
        make_face()
    fillet_3_piece_7 = revolve(axis=Axis((45.758342613, 3, 40.5), (0, -1, 0)), revolution_arc=267.097250193, mode=Mode.PRIVATE)
    fillet_3_piece_7 = split(fillet_3_piece_7, bisect_by=Plane(origin=(45.758342613, 3, 41.5), z_dir=(0, 0, -1)), keep=Keep.TOP, mode=Mode.PRIVATE)
    add(fillet_3_piece_7)
    with BuildSketch(Plane(origin=(52, 3, 34.258342613), x_dir=(-0.802278753819372, 0, -0.596949580090342), z_dir=(-0.596949580090342, 0, 0.802278753819372))) as fillet_3_piece_8_section:
        with BuildLine():
            CenterArc((1 + FILLET_3_R, FILLET_3_R), FILLET_3_R, 180, 90)
            Line((1 + FILLET_3_R, 0), (1, 0))
            Line((1, 0), (1, FILLET_3_R))
        make_face()
    fillet_3_piece_8 = revolve(axis=Axis((52, 3, 34.258342613), (0, -1, 0)), revolution_arc=267.097250193, mode=Mode.PRIVATE)
    fillet_3_piece_8 = split(fillet_3_piece_8, bisect_by=Plane(origin=(53, 3, 34.258342613), z_dir=(-1, 0, 0)), keep=Keep.TOP, mode=Mode.PRIVATE)
    add(fillet_3_piece_8)
    with BuildSketch(Plane(origin=(-52, 3, 34.258342613), x_dir=(0.5555555552777314, 0, 0.8314794194687273), z_dir=(0.8314794194687273, 0, -0.5555555552777314))) as fillet_3_piece_9_section:
        with BuildLine():
            CenterArc((1 + FILLET_3_R, FILLET_3_R), FILLET_3_R, 180, 90)
            Line((1, FILLET_3_R), (1, 0))
            Line((1, 0), (1 + FILLET_3_R, 0))
        make_face()
    fillet_3_piece_9 = revolve(axis=Axis((-52, 3, 34.258342613), (0, -1, 0)), revolution_arc=267.097250193, mode=Mode.PRIVATE)
    fillet_3_piece_9 = split(fillet_3_piece_9, bisect_by=Plane(origin=(-53, 3, 34.258342613), z_dir=(1, 0, 0)), keep=Keep.TOP, mode=Mode.PRIVATE)
    add(fillet_3_piece_9)
    with BuildSketch(Plane(origin=(-45.758342613, 3, 40.5), x_dir=(0.596949580090342, 0, -0.802278753819372), z_dir=(-0.802278753819372, 0, -0.596949580090342))) as fillet_3_piece_10_section:
        with BuildLine():
            CenterArc((1 + FILLET_3_R, FILLET_3_R), FILLET_3_R, 180, 90)
            Line((1, FILLET_3_R), (1, 0))
            Line((1, 0), (1 + FILLET_3_R, 0))
        make_face()
    fillet_3_piece_10 = revolve(axis=Axis((-45.758342613, 3, 40.5), (0, -1, 0)), revolution_arc=267.097250193, mode=Mode.PRIVATE)
    fillet_3_piece_10 = split(fillet_3_piece_10, bisect_by=Plane(origin=(-45.758342613, 3, 41.5), z_dir=(0, 0, -1)), keep=Keep.TOP, mode=Mode.PRIVATE)
    add(fillet_3_piece_10)
    with BuildSketch(Plane(origin=(-45.758342613, 3, -40.5), x_dir=(-0.8314794194687273, 0, 0.5555555552777314), z_dir=(0.5555555552777314, 0, 0.8314794194687273))) as fillet_3_piece_11_section:
        with BuildLine():
            CenterArc((1 + FILLET_3_R, FILLET_3_R), FILLET_3_R, 180, 90)
            Line((1, FILLET_3_R), (1, 0))
            Line((1, 0), (1 + FILLET_3_R, 0))
        make_face()
    fillet_3_piece_11 = revolve(axis=Axis((-45.758342613, 3, -40.5), (0, -1, 0)), revolution_arc=267.097250193, mode=Mode.PRIVATE)
    fillet_3_piece_11 = split(fillet_3_piece_11, bisect_by=Plane(origin=(-45.758342613, 3, -41.5), z_dir=(0, 0, 1)), keep=Keep.TOP, mode=Mode.PRIVATE)
    add(fillet_3_piece_11)
    with BuildSketch(Plane(origin=(-52, 3, -34.258342613), x_dir=(0.802278753819372, 0, 0.596949580090342), z_dir=(0.596949580090342, 0, -0.802278753819372))) as fillet_3_piece_12_section:
        with BuildLine():
            CenterArc((1 + FILLET_3_R, FILLET_3_R), FILLET_3_R, 180, 90)
            Line((1 + FILLET_3_R, 0), (1, 0))
            Line((1, 0), (1, FILLET_3_R))
        make_face()
    fillet_3_piece_12 = revolve(axis=Axis((-52, 3, -34.258342613), (0, -1, 0)), revolution_arc=267.097250193, mode=Mode.PRIVATE)
    fillet_3_piece_12 = split(fillet_3_piece_12, bisect_by=Plane(origin=(-53, 3, -34.258342613), z_dir=(1, 0, 0)), keep=Keep.TOP, mode=Mode.PRIVATE)
    add(fillet_3_piece_12)

    # Эскиз2 → Вырез-Вытянуть3 (cut)
    with BuildSketch(Plane(origin=(0, 0, 0), x_dir=(1, 0, 0), z_dir=(0, 1, 0))):
        with Locations(Location((-4, -13.5, 0), (0, 0, 270))):
            Circle(SKETCH_2_R)
    extrude(amount=CUT_EXTRUDE_3_DEPTH, mode=Mode.SUBTRACT)

    # Эскиз3 → Вырез-Вытянуть5 (cut, through all)
    with BuildSketch(Plane(origin=(0, 0, 0), x_dir=(1, 0, 0), z_dir=(0, 1, 0))):
        with Locations((38, 12.5)):
            Rectangle(SKETCH_3_W, SKETCH_3_H)
    extrude(amount=CUT_EXTRUDE_5_DEPTH, mode=Mode.SUBTRACT)

    # Скругление4
    fillet_4_edges = [part.edges().sort_by_distance(p)[0] for p in [
        (33, 1, -17.5),
        (33, 1, -7.5),
        (43, 1, -7.5),
        (43, 1, -17.5),
    ]]
    fillet(fillet_4_edges, radius=FILLET_4_R)


solid = part.part
